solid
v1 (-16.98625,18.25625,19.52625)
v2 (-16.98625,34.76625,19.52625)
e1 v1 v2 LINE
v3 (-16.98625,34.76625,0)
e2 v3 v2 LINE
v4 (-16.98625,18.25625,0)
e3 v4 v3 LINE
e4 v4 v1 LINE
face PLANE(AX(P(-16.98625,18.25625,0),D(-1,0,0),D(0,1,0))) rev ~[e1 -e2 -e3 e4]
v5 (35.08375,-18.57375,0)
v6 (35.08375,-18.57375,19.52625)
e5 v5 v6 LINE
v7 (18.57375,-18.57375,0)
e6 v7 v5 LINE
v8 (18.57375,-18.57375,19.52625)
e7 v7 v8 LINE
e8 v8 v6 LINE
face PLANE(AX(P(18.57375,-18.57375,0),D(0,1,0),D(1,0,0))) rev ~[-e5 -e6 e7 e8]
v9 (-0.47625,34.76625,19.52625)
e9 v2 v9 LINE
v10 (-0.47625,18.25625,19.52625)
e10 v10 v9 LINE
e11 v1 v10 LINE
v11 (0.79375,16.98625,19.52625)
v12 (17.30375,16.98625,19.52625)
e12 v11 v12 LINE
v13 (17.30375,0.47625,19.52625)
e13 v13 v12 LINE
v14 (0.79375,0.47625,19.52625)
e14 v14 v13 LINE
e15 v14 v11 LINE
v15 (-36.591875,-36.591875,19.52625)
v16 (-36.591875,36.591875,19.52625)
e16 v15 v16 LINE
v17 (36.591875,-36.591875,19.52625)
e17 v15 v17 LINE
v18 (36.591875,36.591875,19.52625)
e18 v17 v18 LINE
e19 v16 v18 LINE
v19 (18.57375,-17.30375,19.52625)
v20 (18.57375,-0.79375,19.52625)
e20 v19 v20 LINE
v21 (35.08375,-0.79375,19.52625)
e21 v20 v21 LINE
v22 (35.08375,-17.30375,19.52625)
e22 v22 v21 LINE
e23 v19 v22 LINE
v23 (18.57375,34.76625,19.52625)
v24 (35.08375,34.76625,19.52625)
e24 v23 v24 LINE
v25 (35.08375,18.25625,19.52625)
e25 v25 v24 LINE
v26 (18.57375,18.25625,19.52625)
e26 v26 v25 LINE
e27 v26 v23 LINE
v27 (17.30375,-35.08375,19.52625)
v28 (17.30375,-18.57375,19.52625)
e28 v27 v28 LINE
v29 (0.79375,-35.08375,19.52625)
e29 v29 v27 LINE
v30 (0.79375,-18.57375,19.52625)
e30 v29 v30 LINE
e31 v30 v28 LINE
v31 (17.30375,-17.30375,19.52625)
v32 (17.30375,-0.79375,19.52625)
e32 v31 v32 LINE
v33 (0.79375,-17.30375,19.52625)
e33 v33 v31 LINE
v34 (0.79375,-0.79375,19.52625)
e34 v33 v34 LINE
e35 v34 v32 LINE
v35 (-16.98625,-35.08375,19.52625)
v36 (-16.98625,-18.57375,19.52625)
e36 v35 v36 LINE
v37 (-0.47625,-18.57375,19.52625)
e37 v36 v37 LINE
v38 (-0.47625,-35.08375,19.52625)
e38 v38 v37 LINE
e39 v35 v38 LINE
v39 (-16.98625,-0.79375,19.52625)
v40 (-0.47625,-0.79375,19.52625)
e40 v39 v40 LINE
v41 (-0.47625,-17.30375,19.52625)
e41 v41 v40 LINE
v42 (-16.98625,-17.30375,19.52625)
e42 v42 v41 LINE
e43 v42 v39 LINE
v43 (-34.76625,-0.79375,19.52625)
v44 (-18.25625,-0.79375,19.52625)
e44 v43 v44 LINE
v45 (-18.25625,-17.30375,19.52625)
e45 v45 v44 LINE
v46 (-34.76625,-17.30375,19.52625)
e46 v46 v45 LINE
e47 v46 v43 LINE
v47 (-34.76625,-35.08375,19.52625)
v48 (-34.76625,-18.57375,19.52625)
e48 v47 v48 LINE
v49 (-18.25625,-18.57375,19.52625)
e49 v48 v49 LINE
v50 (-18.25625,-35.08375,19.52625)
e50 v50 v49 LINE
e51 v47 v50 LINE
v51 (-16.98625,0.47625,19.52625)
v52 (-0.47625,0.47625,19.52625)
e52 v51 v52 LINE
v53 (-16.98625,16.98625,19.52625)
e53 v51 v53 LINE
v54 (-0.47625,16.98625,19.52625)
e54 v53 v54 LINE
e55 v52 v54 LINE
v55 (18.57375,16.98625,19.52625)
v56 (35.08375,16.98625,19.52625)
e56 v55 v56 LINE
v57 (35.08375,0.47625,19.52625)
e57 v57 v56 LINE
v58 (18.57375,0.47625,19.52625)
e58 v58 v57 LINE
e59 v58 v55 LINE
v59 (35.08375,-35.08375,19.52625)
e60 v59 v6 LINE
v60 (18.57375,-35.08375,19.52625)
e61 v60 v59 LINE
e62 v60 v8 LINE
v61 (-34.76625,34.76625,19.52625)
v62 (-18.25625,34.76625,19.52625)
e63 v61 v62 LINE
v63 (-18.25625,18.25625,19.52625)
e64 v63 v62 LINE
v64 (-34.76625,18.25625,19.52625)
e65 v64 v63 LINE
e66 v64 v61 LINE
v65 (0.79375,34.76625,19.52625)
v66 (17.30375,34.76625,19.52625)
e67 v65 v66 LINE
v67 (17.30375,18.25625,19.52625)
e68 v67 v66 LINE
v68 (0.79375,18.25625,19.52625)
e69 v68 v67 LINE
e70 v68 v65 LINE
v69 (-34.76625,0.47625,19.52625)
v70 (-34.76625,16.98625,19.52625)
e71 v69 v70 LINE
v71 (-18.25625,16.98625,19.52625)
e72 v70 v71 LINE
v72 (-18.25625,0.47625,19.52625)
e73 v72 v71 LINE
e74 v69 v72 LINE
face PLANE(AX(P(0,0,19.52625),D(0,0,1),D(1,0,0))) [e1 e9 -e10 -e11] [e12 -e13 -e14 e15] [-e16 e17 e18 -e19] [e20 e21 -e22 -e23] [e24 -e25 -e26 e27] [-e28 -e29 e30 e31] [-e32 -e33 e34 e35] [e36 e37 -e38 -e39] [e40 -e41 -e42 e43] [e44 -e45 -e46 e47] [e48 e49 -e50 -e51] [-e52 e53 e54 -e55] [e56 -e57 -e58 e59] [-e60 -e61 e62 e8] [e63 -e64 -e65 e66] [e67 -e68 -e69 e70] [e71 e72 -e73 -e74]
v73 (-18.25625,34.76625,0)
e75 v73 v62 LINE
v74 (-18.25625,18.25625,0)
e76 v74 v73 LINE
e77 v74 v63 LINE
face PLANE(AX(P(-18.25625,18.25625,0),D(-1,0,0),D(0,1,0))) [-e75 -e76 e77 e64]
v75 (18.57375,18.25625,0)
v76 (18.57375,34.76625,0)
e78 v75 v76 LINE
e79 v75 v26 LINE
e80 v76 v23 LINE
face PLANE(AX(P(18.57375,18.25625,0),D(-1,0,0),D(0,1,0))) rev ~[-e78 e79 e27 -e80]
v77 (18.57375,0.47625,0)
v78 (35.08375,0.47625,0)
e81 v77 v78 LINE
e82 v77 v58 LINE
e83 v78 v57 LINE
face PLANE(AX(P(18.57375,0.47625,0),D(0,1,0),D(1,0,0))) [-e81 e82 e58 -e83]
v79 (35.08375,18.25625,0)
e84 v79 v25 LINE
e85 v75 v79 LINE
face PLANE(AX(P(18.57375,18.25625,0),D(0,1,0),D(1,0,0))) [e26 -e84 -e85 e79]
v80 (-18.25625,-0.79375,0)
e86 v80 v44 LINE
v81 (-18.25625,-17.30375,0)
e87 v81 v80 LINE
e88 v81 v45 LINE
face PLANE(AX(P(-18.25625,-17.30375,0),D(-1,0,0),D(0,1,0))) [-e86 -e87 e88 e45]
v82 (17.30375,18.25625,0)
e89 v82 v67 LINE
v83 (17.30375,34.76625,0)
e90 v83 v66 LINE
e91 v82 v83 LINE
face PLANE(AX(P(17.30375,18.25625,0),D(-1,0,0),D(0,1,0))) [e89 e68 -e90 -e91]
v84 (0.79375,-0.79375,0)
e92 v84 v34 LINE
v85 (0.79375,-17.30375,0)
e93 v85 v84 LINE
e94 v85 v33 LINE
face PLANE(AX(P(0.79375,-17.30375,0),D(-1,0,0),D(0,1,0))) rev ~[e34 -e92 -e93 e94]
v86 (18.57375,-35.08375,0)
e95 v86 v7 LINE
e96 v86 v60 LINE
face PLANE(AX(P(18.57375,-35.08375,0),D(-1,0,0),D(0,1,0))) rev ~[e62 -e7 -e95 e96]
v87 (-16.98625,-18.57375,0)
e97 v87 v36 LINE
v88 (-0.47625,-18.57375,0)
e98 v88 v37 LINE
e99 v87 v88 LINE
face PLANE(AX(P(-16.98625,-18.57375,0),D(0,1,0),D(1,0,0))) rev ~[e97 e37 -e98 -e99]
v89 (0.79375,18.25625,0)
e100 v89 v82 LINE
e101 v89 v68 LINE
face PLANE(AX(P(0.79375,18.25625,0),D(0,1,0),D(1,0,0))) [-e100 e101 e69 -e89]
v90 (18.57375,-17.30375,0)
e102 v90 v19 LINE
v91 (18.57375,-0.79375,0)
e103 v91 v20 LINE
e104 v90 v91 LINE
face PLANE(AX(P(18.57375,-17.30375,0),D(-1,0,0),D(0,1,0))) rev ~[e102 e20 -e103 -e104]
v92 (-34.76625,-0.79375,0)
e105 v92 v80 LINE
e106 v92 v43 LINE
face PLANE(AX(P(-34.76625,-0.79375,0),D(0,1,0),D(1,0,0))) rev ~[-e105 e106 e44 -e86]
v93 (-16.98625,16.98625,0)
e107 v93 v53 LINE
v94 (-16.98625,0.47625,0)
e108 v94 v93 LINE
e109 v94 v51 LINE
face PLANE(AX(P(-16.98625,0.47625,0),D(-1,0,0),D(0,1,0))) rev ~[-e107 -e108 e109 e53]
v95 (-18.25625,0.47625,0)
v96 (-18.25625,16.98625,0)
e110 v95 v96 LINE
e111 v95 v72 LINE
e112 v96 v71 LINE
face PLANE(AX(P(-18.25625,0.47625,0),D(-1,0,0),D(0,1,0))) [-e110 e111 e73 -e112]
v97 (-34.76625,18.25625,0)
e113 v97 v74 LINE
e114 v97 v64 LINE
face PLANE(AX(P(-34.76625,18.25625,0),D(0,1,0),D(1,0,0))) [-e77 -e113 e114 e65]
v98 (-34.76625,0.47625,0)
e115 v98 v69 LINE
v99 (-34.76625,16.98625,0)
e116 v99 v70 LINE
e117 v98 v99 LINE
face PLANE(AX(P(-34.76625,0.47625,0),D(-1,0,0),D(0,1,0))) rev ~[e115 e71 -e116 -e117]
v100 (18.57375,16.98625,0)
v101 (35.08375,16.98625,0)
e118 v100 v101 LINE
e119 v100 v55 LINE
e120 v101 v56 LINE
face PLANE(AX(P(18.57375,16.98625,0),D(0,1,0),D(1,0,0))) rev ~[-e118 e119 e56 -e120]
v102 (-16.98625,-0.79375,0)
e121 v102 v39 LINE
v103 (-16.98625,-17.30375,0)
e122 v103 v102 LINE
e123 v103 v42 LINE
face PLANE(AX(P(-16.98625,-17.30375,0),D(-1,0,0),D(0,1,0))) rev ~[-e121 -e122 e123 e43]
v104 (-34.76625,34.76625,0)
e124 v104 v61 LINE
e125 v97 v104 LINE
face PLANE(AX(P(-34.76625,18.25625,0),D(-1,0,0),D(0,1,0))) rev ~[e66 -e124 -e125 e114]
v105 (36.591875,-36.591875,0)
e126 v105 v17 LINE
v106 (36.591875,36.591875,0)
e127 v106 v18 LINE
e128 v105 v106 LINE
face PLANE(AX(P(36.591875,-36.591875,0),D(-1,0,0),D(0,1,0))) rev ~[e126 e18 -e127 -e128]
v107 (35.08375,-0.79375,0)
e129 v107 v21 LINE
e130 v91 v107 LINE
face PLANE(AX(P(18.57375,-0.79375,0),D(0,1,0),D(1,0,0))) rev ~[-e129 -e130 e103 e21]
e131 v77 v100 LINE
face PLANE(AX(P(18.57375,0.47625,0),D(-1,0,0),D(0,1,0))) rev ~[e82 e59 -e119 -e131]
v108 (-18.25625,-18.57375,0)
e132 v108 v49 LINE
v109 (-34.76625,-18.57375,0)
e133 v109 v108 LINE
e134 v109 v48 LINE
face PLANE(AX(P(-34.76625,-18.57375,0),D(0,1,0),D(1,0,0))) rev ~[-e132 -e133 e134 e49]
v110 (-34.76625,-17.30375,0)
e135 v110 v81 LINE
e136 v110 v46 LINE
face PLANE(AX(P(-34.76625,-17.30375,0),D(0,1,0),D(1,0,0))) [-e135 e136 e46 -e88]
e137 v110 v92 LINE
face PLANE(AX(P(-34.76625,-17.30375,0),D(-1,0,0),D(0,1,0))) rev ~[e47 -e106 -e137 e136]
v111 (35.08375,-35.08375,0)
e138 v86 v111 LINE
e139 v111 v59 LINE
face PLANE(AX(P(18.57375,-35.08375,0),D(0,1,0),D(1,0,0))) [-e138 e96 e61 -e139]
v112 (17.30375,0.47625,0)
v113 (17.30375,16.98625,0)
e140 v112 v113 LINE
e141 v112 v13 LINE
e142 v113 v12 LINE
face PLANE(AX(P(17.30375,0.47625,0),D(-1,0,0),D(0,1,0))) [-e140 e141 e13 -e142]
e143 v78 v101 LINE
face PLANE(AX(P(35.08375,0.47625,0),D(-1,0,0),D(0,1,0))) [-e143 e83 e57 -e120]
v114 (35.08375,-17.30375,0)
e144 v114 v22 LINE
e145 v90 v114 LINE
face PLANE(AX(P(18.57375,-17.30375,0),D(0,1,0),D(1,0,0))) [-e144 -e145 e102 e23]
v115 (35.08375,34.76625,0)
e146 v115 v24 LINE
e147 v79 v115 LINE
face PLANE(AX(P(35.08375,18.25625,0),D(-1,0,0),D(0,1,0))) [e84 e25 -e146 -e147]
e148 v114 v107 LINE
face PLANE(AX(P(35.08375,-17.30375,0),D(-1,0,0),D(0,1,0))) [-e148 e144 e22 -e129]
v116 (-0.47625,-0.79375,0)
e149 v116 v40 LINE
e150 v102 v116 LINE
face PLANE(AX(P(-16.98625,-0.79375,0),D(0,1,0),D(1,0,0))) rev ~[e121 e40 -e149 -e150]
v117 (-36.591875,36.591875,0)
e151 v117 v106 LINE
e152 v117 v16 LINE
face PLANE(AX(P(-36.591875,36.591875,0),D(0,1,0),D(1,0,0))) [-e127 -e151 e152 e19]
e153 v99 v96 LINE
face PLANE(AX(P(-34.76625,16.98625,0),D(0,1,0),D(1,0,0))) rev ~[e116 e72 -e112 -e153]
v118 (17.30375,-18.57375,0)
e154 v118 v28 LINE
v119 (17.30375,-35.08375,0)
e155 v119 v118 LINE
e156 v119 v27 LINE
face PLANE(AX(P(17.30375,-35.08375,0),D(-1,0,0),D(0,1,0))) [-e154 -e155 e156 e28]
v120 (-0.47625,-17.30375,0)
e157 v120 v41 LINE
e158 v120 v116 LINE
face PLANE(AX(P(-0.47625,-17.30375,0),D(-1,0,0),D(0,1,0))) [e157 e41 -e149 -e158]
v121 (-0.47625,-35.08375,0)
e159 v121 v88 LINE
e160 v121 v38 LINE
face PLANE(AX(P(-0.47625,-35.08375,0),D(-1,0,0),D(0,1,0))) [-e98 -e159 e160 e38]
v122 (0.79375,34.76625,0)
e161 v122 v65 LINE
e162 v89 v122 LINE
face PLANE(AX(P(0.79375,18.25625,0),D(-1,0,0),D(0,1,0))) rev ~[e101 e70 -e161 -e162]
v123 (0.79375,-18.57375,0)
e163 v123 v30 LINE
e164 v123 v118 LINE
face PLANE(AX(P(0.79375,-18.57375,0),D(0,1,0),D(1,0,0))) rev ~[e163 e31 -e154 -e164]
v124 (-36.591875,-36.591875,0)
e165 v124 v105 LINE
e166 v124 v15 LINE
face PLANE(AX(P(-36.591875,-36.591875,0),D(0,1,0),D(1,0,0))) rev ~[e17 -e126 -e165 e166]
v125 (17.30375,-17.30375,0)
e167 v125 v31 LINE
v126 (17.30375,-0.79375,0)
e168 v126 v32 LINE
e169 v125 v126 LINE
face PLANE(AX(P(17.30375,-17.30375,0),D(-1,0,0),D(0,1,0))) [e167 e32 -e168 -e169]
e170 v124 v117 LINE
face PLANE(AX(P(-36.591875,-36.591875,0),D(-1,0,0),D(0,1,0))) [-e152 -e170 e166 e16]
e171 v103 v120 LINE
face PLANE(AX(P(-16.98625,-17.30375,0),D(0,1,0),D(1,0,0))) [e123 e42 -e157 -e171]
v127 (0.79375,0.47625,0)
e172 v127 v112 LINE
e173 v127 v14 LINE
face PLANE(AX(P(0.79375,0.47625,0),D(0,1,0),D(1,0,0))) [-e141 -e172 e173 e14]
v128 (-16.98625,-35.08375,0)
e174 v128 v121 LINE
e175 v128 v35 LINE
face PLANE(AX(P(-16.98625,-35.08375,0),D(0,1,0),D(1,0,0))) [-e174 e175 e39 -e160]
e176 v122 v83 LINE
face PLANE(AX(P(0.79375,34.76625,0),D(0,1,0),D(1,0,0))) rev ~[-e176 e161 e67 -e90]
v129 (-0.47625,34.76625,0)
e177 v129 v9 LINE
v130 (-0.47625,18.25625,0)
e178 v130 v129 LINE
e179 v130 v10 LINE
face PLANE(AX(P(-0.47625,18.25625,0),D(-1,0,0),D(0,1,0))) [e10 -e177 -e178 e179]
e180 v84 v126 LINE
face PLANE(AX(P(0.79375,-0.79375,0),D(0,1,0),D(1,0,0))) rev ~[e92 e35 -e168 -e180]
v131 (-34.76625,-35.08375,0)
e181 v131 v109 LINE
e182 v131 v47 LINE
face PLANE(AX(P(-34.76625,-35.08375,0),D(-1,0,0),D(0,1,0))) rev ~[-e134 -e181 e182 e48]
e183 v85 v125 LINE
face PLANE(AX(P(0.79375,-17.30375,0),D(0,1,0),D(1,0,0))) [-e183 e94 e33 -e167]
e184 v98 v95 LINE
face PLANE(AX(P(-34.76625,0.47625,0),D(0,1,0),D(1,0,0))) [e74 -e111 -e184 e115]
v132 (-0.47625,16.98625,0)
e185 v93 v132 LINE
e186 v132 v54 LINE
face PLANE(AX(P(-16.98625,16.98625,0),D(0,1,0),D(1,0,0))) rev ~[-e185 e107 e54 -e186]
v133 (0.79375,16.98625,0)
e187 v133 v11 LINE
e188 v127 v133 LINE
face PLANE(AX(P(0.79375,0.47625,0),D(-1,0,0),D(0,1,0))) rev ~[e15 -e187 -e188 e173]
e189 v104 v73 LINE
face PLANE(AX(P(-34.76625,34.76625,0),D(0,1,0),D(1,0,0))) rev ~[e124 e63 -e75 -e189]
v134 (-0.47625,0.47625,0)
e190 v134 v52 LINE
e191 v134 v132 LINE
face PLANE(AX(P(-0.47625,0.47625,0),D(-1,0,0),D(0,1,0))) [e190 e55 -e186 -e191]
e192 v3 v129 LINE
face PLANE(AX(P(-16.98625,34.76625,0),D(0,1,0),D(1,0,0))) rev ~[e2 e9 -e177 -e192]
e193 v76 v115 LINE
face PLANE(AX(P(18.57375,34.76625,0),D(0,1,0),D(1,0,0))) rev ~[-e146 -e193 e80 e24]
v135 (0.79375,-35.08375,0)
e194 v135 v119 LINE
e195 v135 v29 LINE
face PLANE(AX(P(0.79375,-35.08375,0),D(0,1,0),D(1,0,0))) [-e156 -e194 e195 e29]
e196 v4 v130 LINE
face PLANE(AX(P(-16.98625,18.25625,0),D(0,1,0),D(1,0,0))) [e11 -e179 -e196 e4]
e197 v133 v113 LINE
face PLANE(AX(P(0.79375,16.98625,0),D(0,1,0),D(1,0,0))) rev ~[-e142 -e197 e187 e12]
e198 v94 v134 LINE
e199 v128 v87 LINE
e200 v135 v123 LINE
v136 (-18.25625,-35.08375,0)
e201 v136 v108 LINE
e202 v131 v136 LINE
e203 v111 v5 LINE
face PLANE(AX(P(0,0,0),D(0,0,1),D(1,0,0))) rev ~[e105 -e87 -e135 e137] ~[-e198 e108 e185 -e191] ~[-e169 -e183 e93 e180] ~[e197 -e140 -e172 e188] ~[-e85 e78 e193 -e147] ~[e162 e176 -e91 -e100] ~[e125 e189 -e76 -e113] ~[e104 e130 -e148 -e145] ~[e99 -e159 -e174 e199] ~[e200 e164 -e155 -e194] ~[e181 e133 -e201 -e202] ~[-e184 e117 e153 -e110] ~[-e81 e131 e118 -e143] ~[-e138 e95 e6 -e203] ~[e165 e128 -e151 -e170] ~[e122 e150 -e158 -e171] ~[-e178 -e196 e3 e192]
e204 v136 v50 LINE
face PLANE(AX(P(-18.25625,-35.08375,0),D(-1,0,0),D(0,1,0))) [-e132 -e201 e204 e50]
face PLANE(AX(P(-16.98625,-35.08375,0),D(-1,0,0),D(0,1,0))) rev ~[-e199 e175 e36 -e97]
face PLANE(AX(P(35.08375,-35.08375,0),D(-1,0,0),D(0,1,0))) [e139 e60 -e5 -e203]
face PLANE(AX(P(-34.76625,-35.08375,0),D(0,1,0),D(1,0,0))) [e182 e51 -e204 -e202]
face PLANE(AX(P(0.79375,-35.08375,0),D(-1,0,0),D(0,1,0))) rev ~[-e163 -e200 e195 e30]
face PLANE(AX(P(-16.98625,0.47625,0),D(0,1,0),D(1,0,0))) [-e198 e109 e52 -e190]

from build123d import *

# Parameters (mm, degrees)
F0_W     = 1463.675
F0_H     = 1463.675
F0_W_2   = 330.2
F0_H_2   = 330.2
F1_DEPTH = 390.525
F2_SCALE = 0.05


with BuildPart() as f1:
    # F0 (on Top) → F1 (new body)
    with BuildSketch(Plane.XY):
        Rectangle(F0_W, F0_H)
        with Locations((-530.225, -536.575)):
            Rectangle(F0_W_2, F0_H_2, mode=Mode.SUBTRACT)
        with Locations((-174.625, -536.575)):
            Rectangle(F0_W_2, F0_H_2, mode=Mode.SUBTRACT)
        with Locations((-530.225, -180.975)):
            Rectangle(F0_W_2, F0_H_2, mode=Mode.SUBTRACT)
        with Locations((-174.625, -180.975)):
            Rectangle(F0_W_2, F0_H_2, mode=Mode.SUBTRACT)
        with Locations((180.975, -536.575)):
            Rectangle(F0_W_2, F0_H_2, mode=Mode.SUBTRACT)
        with Locations((536.575, -536.575)):
            Rectangle(F0_W_2, F0_H_2, mode=Mode.SUBTRACT)
        with Locations((180.975, -180.975)):
            Rectangle(F0_W_2, F0_H_2, mode=Mode.SUBTRACT)
        with Locations((536.575, -180.975)):
            Rectangle(F0_W_2, F0_H_2, mode=Mode.SUBTRACT)
        with Locations((-530.225, 174.625)):
            Rectangle(F0_W_2, F0_H_2, mode=Mode.SUBTRACT)
        with Locations((-174.625, 174.625)):
            Rectangle(F0_W_2, F0_H_2, mode=Mode.SUBTRACT)
        with Locations((-530.225, 530.225)):
            Rectangle(F0_W_2, F0_H_2, mode=Mode.SUBTRACT)
        with Locations((-174.625, 530.225)):
            Rectangle(F0_W_2, F0_H_2, mode=Mode.SUBTRACT)
        with Locations((180.975, 174.625)):
            Rectangle(F0_W_2, F0_H_2, mode=Mode.SUBTRACT)
        with Locations((536.575, 174.625)):
            Rectangle(F0_W_2, F0_H_2, mode=Mode.SUBTRACT)
        with Locations((180.975, 530.225)):
            Rectangle(F0_W_2, F0_H_2, mode=Mode.SUBTRACT)
        with Locations((536.575, 530.225)):
            Rectangle(F0_W_2, F0_H_2, mode=Mode.SUBTRACT)
    extrude(amount=F1_DEPTH)


with BuildPart() as f1_1:
    # F2: moved
    add(f1.part.scale(F2_SCALE))


solid = f1_1.part
